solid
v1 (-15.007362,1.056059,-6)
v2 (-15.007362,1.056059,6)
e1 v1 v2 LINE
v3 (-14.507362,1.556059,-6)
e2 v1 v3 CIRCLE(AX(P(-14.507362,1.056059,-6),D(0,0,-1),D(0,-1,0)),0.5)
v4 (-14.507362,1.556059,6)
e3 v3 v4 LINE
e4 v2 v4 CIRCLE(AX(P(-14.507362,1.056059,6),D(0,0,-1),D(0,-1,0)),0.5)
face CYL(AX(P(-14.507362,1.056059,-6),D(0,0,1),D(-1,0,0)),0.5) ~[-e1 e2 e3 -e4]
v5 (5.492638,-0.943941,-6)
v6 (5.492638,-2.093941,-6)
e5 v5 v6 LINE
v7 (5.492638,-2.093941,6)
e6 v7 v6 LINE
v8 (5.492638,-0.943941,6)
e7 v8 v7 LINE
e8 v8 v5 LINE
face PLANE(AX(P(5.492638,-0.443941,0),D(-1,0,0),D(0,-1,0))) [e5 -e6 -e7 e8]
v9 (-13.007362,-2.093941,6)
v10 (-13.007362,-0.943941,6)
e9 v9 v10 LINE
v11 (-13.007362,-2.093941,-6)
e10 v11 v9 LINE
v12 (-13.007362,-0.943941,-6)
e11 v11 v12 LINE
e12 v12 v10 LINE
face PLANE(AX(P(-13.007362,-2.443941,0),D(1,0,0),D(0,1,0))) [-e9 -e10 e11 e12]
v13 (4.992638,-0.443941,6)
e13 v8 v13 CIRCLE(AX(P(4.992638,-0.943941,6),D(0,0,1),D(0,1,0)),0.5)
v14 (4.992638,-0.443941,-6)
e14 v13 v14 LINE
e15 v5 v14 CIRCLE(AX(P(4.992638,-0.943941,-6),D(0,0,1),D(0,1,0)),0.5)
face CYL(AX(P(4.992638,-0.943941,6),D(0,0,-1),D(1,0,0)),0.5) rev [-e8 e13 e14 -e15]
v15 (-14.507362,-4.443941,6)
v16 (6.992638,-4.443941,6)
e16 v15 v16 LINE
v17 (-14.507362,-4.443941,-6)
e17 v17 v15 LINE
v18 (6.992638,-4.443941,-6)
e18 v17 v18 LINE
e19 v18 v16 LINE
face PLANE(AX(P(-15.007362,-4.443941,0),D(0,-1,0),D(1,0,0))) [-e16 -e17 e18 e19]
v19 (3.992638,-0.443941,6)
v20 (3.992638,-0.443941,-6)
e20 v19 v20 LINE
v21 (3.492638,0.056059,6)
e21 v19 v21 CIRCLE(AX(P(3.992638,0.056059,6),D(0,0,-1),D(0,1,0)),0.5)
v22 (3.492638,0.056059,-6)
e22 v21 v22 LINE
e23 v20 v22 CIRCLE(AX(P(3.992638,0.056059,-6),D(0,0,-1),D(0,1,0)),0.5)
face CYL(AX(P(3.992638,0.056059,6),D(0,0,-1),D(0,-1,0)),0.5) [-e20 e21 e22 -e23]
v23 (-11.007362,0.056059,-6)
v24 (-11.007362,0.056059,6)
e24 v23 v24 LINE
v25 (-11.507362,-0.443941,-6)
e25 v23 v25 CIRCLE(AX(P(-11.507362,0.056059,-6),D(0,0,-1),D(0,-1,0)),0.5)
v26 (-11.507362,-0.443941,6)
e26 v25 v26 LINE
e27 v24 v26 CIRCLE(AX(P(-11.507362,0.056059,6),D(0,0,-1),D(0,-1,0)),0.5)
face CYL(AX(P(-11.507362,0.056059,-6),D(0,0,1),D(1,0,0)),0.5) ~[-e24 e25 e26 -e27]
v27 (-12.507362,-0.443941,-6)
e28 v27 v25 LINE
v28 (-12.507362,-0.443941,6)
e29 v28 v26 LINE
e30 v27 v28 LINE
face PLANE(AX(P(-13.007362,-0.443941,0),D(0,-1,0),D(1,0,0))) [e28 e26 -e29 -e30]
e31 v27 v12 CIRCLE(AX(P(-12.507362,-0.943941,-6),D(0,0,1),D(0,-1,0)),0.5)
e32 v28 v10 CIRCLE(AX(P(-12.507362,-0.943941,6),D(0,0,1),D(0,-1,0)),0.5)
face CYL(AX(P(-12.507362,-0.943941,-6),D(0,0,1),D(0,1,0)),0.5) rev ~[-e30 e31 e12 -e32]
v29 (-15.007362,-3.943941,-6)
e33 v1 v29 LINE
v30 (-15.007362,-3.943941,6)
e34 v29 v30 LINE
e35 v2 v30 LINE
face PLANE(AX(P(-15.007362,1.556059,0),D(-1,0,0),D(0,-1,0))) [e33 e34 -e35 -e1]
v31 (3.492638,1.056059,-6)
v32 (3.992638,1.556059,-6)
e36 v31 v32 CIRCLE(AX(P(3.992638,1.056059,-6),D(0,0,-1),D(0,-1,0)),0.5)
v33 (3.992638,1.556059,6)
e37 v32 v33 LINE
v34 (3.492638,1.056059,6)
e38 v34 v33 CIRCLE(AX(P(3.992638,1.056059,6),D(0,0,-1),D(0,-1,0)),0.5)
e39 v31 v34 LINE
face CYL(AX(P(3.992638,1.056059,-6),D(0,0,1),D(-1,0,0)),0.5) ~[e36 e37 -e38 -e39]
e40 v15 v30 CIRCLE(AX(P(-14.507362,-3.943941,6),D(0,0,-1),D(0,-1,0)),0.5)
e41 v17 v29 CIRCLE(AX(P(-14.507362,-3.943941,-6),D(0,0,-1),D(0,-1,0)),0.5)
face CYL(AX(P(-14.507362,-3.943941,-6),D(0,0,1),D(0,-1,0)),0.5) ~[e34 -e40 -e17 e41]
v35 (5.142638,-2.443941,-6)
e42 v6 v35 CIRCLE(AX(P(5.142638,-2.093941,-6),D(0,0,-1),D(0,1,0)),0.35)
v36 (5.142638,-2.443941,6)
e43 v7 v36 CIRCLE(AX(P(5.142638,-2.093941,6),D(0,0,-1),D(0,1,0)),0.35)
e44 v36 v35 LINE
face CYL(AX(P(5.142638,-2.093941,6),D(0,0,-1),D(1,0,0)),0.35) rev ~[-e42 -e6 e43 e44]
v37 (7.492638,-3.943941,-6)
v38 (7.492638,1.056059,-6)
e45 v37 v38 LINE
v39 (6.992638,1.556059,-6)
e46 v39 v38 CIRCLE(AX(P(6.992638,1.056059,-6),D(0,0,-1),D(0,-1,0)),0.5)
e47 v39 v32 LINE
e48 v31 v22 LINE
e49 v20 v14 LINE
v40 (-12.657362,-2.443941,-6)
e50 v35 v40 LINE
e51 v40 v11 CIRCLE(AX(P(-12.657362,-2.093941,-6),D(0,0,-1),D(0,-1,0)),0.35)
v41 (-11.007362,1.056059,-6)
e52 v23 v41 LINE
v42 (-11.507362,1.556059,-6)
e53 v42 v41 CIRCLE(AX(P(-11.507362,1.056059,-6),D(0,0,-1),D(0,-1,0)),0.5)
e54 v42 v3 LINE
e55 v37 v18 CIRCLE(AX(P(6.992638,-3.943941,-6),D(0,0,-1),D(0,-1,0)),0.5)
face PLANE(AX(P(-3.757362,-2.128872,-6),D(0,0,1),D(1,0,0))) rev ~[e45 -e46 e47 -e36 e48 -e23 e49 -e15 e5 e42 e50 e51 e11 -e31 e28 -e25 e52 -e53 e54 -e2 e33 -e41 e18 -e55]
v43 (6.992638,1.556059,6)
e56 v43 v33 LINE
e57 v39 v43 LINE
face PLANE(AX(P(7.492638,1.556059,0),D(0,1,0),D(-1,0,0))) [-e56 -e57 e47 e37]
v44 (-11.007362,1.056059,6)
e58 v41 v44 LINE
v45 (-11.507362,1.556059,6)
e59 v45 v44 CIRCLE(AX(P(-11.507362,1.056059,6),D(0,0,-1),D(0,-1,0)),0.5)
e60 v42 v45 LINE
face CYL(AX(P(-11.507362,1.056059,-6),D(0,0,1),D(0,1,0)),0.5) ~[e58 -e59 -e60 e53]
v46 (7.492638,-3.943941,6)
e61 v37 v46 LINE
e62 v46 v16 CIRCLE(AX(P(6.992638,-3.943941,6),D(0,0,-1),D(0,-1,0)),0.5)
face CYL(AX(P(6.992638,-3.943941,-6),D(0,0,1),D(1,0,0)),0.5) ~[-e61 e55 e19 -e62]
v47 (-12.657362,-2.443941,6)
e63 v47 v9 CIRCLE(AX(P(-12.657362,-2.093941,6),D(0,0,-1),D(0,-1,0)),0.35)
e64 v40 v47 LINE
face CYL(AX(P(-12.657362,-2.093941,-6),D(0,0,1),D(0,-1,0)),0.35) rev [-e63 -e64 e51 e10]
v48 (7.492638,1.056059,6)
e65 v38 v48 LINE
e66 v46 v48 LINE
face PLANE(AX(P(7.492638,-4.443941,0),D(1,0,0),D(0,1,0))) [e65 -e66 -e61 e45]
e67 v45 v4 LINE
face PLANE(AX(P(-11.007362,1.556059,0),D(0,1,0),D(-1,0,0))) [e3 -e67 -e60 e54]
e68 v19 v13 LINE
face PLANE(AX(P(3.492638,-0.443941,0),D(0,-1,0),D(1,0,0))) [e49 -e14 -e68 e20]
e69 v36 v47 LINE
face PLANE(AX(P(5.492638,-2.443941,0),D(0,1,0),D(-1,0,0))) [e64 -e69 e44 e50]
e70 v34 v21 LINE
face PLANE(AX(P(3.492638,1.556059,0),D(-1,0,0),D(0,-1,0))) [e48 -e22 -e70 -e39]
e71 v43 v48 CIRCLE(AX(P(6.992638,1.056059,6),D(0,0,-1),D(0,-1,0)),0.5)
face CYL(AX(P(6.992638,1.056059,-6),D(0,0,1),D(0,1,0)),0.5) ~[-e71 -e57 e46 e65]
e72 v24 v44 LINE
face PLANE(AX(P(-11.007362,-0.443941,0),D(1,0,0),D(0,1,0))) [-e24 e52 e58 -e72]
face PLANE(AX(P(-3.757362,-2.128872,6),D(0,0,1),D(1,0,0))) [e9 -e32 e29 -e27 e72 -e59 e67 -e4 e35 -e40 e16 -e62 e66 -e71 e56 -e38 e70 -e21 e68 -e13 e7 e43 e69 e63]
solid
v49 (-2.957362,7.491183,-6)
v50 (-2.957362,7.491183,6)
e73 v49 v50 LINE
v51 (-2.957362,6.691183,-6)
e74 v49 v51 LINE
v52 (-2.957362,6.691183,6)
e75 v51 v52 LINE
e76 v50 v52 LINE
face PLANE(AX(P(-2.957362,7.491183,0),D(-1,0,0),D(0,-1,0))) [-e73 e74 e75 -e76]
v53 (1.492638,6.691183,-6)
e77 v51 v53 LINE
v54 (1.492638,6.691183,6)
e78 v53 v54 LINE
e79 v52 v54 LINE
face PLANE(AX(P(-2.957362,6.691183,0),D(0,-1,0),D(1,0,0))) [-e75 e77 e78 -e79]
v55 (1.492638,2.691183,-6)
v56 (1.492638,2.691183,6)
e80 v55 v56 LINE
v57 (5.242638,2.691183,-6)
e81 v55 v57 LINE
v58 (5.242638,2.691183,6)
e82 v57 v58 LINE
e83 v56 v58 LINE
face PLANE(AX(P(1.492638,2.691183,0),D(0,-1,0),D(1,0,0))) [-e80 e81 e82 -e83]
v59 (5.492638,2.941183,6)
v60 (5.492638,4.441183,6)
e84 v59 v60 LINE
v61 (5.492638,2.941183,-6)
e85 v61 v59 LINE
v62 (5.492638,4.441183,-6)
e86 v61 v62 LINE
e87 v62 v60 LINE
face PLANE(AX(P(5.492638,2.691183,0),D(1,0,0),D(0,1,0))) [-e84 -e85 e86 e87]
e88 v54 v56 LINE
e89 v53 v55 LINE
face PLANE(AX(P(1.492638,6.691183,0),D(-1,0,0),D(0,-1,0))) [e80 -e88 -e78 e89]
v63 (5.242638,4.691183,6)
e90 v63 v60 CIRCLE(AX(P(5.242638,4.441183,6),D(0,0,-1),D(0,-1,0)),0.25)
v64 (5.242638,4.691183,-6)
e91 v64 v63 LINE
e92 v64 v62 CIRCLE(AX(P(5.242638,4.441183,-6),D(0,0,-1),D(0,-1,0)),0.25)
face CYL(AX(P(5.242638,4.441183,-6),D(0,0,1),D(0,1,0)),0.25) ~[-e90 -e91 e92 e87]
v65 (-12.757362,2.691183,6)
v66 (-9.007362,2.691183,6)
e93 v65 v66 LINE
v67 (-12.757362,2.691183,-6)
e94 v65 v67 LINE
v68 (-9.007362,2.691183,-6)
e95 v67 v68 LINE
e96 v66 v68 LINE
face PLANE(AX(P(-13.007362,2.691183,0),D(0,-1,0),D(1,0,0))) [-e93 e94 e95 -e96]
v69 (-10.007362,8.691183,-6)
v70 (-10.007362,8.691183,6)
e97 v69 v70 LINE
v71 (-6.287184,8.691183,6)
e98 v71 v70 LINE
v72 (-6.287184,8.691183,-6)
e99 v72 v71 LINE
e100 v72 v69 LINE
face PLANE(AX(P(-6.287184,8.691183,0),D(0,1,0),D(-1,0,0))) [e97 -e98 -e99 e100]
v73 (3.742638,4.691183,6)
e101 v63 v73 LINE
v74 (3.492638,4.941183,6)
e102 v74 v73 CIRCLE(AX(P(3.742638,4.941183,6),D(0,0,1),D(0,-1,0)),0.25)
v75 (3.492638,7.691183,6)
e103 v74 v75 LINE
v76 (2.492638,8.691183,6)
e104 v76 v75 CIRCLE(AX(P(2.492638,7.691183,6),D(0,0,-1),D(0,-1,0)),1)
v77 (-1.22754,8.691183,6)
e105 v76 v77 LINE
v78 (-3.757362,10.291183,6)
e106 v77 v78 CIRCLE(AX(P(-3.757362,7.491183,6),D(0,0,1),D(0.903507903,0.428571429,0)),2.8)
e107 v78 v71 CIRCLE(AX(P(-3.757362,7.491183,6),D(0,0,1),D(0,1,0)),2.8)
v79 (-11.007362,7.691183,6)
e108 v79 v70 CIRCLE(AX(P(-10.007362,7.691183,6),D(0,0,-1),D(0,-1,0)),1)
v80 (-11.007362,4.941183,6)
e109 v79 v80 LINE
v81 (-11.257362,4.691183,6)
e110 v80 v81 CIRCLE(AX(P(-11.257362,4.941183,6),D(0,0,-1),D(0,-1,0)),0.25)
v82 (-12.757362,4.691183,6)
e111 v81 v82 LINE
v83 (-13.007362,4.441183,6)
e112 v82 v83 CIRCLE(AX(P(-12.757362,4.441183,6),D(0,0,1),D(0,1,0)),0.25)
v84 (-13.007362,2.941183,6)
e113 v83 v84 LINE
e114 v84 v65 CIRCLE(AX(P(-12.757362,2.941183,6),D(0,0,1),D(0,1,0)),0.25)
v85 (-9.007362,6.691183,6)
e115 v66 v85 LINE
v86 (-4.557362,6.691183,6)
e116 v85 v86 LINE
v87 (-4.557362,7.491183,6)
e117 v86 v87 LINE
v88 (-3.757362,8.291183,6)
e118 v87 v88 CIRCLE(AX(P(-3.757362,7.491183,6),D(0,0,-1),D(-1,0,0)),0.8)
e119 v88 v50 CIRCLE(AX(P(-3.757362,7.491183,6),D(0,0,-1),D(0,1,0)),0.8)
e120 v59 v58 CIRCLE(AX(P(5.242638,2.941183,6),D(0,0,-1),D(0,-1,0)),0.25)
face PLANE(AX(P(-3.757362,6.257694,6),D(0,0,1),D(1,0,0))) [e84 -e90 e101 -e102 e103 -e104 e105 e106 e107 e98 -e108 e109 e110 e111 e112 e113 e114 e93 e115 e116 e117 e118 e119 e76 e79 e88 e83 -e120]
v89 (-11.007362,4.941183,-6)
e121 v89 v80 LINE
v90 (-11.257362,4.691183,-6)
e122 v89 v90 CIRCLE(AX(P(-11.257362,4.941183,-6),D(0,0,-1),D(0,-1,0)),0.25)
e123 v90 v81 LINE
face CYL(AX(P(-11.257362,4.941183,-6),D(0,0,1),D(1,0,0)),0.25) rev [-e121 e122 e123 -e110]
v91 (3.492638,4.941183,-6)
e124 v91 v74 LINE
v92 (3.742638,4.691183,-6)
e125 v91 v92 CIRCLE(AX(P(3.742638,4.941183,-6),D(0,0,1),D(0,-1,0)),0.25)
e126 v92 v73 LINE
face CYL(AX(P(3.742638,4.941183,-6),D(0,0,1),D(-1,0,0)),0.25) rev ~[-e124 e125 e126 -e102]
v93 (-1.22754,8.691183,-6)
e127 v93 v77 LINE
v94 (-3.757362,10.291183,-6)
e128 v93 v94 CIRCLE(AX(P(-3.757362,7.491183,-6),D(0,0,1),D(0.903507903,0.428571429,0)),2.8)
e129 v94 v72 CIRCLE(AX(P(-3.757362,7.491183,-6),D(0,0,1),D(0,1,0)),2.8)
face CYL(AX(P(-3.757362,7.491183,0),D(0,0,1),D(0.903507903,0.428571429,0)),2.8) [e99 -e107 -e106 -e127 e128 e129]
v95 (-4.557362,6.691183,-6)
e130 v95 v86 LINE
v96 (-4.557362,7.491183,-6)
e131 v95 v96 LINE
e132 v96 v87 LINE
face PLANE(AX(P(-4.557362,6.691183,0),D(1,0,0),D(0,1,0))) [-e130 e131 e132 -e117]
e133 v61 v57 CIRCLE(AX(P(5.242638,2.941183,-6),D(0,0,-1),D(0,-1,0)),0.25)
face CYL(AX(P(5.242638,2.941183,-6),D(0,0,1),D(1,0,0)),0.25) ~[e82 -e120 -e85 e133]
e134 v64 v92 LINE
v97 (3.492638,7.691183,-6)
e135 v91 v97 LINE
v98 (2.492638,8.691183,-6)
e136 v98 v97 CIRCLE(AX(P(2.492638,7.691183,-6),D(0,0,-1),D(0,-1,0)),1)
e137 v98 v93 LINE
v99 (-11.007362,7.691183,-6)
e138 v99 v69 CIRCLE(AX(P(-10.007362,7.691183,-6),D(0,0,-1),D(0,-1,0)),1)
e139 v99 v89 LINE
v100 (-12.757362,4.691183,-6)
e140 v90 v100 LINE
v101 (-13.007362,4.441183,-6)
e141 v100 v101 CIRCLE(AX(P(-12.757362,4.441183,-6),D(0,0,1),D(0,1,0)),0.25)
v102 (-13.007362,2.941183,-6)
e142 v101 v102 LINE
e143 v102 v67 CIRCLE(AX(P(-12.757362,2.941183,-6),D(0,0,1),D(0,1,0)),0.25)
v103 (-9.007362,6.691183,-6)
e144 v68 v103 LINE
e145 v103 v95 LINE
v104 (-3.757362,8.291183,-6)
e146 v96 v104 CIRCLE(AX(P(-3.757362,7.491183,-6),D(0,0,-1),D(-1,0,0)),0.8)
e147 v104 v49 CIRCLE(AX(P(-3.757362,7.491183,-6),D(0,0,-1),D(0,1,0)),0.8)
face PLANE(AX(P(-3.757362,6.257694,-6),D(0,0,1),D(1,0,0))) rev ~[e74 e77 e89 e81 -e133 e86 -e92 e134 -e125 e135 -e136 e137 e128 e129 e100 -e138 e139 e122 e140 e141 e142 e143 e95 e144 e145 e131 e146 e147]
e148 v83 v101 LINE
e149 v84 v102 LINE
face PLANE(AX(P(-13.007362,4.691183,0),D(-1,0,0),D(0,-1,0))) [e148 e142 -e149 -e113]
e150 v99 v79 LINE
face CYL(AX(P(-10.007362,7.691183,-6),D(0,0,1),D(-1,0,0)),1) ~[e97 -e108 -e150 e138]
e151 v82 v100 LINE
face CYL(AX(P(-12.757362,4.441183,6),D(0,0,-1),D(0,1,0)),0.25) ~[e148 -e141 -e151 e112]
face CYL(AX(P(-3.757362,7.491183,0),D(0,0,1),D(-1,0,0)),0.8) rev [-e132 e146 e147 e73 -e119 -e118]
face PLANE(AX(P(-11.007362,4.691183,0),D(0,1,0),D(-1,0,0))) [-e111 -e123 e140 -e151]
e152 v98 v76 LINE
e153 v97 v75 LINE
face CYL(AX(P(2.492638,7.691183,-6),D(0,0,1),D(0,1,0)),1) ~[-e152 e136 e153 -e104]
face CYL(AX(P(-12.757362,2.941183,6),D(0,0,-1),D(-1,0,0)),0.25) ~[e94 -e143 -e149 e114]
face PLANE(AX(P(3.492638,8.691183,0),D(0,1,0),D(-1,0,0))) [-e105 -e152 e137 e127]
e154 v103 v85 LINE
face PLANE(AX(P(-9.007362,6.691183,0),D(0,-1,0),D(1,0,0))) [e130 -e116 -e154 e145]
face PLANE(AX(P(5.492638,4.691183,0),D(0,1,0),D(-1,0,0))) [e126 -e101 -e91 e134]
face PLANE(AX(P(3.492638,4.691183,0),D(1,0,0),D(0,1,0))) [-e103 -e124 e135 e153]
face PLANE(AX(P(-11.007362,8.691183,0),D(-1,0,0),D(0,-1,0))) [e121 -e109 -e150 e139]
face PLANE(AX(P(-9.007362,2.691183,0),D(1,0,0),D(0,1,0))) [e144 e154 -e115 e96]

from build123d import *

# Parameters (mm, degrees)
F1_DEPTH = 6
F2_R     = 1
F3_R     = 0.25
F4_R     = 0.5
F5_R     = 0.35


# Not quite as in the source:
# - a feature names something its author has since deleted; it is built from what else it names


with BuildPart() as f1:
    # F0 (on Top) → F1 (new body, symmetric)
    with BuildSketch(Plane.XY):
        with BuildLine():
            Line((-9.0073623574, 2.6911826732), (-9.0073623574, 6.6911826732))
            Line((-9.0073623574, 6.6911826732), (-4.5573623574, 6.6911826732))
            Line((-4.5573623574, 6.6911826732), (-4.5573623574, 7.4911826732))
            ThreePointArc((-4.5573623574, 7.4911826732), (-4.3230477824, 8.0568680982), (-3.7573623574, 8.2911826732))
            ThreePointArc((-3.7573623574, 8.2911826732), (-3.1916769325, 8.0568680982), (-2.9573623574, 7.4911826732))
            Line((-2.9573623574, 7.4911826732), (-2.9573623574, 6.6911826732))
            Line((-2.9573623574, 6.6911826732), (1.4926376426, 6.6911826732))
            Line((1.4926376426, 6.6911826732), (1.4926376426, 2.6911826732))
            Line((1.4926376426, 2.6911826732), (3.4926376426, 2.6911826732))
            Line((3.4926376426, 2.6911826732), (5.4926376426, 2.6911826732))
            Line((5.4926376426, 2.6911826732), (5.4926376426, 4.6911826732))
            Line((5.4926376426, 4.6911826732), (3.4926376426, 4.6911826732))
            Line((3.4926376426, 4.6911826732), (3.4926376426, 8.6911826732))
            Line((3.4926376426, 8.6911826732), (-1.2275402293, 8.6911826732))
            ThreePointArc((-1.2275402293, 8.6911826732), (-2.2606994027, 9.8576145865), (-3.7573623574, 10.2911826732))
            ThreePointArc((-3.7573623574, 10.2911826732), (-5.2540253122, 9.8576145865), (-6.2871844856, 8.6911826732))
            Line((-6.2871844856, 8.6911826732), (-11.0073623574, 8.6911826732))
            Line((-11.0073623574, 8.6911826732), (-11.0073623574, 4.6911826732))
            Line((-11.0073623574, 4.6911826732), (-13.0073623574, 4.6911826732))
            Line((-13.0073623574, 4.6911826732), (-13.0073623574, 2.6911826732))
            Line((-13.0073623574, 2.6911826732), (-11.0073623574, 2.6911826732))
            Line((-11.0073623574, 2.6911826732), (-9.0073623574, 2.6911826732))
        make_face()
    extrude(amount=F1_DEPTH, both=True)

    # F2
    f2_edges = [f1.edges().sort_by_distance(p)[0] for p in [
        (-11.007362, 8.691183, 0),
        (3.492638, 8.691183, 0),
    ]]
    fillet(f2_edges, radius=F2_R)

    # F3
    f3_edges = [f1.edges().sort_by_distance(p)[0] for p in [
        (-11.007362, 4.691183, 0),
        (-13.007362, 4.691183, 0),
        (-13.007362, 2.691183, 0),
        (3.492638, 4.691183, 0),
        (5.492638, 4.691183, 0),
        (5.492638, 2.691183, 0),
    ]]
    fillet(f3_edges, radius=F3_R)


with BuildPart() as f1b:
    # F0 (on Top) → F1, piece 2 (new body, symmetric)
    with BuildSketch(Plane.XY):
        Polygon((5.4926376426, -2.4439409186), (-3.7573623574, -2.4439409186), (-13.0073623574, -2.4439409186), (-13.0073623574, -0.4439409186), (-11.0073623574, -0.4439409186), (-11.0073623574, 1.5560590814), (-15.0073623574, 1.5560590814), (-15.0073623574, -4.4439409186), (-3.7573623574, -4.4439409186), (7.4926376426, -4.4439409186), (7.4926376426, 1.5560590814), (3.4926376426, 1.5560590814), (3.4926376426, -0.4439409186), (5.4926376426, -0.4439409186), align=None)
    extrude(amount=F1_DEPTH, both=True)

    # F4
    f4_edges = [f1b.edges().sort_by_distance(p)[0] for p in [
        (3.492638, -0.443941, 0),
        (5.492638, -0.443941, 0),
        (-11.007362, 1.556059, 0),
        (3.492638, 1.556059, 0),
        (-15.007362, 1.556059, 0),
        (7.492638, 1.556059, 0),
        (-15.007362, -4.443941, 0),
        (7.492638, -4.443941, 0),
        (-11.007362, -0.443941, 0),
        (-13.007362, -0.443941, 0),
    ]]
    fillet(f4_edges, radius=F4_R)

    # F5
    f5_edges = [f1b.edges().sort_by_distance(p)[0] for p in [
        (-13.007362, -2.443941, 0),
        (5.492638, -2.443941, 0),
    ]]
    fillet(f5_edges, radius=F5_R)


solid = Compound([f1.part, f1b.part])
